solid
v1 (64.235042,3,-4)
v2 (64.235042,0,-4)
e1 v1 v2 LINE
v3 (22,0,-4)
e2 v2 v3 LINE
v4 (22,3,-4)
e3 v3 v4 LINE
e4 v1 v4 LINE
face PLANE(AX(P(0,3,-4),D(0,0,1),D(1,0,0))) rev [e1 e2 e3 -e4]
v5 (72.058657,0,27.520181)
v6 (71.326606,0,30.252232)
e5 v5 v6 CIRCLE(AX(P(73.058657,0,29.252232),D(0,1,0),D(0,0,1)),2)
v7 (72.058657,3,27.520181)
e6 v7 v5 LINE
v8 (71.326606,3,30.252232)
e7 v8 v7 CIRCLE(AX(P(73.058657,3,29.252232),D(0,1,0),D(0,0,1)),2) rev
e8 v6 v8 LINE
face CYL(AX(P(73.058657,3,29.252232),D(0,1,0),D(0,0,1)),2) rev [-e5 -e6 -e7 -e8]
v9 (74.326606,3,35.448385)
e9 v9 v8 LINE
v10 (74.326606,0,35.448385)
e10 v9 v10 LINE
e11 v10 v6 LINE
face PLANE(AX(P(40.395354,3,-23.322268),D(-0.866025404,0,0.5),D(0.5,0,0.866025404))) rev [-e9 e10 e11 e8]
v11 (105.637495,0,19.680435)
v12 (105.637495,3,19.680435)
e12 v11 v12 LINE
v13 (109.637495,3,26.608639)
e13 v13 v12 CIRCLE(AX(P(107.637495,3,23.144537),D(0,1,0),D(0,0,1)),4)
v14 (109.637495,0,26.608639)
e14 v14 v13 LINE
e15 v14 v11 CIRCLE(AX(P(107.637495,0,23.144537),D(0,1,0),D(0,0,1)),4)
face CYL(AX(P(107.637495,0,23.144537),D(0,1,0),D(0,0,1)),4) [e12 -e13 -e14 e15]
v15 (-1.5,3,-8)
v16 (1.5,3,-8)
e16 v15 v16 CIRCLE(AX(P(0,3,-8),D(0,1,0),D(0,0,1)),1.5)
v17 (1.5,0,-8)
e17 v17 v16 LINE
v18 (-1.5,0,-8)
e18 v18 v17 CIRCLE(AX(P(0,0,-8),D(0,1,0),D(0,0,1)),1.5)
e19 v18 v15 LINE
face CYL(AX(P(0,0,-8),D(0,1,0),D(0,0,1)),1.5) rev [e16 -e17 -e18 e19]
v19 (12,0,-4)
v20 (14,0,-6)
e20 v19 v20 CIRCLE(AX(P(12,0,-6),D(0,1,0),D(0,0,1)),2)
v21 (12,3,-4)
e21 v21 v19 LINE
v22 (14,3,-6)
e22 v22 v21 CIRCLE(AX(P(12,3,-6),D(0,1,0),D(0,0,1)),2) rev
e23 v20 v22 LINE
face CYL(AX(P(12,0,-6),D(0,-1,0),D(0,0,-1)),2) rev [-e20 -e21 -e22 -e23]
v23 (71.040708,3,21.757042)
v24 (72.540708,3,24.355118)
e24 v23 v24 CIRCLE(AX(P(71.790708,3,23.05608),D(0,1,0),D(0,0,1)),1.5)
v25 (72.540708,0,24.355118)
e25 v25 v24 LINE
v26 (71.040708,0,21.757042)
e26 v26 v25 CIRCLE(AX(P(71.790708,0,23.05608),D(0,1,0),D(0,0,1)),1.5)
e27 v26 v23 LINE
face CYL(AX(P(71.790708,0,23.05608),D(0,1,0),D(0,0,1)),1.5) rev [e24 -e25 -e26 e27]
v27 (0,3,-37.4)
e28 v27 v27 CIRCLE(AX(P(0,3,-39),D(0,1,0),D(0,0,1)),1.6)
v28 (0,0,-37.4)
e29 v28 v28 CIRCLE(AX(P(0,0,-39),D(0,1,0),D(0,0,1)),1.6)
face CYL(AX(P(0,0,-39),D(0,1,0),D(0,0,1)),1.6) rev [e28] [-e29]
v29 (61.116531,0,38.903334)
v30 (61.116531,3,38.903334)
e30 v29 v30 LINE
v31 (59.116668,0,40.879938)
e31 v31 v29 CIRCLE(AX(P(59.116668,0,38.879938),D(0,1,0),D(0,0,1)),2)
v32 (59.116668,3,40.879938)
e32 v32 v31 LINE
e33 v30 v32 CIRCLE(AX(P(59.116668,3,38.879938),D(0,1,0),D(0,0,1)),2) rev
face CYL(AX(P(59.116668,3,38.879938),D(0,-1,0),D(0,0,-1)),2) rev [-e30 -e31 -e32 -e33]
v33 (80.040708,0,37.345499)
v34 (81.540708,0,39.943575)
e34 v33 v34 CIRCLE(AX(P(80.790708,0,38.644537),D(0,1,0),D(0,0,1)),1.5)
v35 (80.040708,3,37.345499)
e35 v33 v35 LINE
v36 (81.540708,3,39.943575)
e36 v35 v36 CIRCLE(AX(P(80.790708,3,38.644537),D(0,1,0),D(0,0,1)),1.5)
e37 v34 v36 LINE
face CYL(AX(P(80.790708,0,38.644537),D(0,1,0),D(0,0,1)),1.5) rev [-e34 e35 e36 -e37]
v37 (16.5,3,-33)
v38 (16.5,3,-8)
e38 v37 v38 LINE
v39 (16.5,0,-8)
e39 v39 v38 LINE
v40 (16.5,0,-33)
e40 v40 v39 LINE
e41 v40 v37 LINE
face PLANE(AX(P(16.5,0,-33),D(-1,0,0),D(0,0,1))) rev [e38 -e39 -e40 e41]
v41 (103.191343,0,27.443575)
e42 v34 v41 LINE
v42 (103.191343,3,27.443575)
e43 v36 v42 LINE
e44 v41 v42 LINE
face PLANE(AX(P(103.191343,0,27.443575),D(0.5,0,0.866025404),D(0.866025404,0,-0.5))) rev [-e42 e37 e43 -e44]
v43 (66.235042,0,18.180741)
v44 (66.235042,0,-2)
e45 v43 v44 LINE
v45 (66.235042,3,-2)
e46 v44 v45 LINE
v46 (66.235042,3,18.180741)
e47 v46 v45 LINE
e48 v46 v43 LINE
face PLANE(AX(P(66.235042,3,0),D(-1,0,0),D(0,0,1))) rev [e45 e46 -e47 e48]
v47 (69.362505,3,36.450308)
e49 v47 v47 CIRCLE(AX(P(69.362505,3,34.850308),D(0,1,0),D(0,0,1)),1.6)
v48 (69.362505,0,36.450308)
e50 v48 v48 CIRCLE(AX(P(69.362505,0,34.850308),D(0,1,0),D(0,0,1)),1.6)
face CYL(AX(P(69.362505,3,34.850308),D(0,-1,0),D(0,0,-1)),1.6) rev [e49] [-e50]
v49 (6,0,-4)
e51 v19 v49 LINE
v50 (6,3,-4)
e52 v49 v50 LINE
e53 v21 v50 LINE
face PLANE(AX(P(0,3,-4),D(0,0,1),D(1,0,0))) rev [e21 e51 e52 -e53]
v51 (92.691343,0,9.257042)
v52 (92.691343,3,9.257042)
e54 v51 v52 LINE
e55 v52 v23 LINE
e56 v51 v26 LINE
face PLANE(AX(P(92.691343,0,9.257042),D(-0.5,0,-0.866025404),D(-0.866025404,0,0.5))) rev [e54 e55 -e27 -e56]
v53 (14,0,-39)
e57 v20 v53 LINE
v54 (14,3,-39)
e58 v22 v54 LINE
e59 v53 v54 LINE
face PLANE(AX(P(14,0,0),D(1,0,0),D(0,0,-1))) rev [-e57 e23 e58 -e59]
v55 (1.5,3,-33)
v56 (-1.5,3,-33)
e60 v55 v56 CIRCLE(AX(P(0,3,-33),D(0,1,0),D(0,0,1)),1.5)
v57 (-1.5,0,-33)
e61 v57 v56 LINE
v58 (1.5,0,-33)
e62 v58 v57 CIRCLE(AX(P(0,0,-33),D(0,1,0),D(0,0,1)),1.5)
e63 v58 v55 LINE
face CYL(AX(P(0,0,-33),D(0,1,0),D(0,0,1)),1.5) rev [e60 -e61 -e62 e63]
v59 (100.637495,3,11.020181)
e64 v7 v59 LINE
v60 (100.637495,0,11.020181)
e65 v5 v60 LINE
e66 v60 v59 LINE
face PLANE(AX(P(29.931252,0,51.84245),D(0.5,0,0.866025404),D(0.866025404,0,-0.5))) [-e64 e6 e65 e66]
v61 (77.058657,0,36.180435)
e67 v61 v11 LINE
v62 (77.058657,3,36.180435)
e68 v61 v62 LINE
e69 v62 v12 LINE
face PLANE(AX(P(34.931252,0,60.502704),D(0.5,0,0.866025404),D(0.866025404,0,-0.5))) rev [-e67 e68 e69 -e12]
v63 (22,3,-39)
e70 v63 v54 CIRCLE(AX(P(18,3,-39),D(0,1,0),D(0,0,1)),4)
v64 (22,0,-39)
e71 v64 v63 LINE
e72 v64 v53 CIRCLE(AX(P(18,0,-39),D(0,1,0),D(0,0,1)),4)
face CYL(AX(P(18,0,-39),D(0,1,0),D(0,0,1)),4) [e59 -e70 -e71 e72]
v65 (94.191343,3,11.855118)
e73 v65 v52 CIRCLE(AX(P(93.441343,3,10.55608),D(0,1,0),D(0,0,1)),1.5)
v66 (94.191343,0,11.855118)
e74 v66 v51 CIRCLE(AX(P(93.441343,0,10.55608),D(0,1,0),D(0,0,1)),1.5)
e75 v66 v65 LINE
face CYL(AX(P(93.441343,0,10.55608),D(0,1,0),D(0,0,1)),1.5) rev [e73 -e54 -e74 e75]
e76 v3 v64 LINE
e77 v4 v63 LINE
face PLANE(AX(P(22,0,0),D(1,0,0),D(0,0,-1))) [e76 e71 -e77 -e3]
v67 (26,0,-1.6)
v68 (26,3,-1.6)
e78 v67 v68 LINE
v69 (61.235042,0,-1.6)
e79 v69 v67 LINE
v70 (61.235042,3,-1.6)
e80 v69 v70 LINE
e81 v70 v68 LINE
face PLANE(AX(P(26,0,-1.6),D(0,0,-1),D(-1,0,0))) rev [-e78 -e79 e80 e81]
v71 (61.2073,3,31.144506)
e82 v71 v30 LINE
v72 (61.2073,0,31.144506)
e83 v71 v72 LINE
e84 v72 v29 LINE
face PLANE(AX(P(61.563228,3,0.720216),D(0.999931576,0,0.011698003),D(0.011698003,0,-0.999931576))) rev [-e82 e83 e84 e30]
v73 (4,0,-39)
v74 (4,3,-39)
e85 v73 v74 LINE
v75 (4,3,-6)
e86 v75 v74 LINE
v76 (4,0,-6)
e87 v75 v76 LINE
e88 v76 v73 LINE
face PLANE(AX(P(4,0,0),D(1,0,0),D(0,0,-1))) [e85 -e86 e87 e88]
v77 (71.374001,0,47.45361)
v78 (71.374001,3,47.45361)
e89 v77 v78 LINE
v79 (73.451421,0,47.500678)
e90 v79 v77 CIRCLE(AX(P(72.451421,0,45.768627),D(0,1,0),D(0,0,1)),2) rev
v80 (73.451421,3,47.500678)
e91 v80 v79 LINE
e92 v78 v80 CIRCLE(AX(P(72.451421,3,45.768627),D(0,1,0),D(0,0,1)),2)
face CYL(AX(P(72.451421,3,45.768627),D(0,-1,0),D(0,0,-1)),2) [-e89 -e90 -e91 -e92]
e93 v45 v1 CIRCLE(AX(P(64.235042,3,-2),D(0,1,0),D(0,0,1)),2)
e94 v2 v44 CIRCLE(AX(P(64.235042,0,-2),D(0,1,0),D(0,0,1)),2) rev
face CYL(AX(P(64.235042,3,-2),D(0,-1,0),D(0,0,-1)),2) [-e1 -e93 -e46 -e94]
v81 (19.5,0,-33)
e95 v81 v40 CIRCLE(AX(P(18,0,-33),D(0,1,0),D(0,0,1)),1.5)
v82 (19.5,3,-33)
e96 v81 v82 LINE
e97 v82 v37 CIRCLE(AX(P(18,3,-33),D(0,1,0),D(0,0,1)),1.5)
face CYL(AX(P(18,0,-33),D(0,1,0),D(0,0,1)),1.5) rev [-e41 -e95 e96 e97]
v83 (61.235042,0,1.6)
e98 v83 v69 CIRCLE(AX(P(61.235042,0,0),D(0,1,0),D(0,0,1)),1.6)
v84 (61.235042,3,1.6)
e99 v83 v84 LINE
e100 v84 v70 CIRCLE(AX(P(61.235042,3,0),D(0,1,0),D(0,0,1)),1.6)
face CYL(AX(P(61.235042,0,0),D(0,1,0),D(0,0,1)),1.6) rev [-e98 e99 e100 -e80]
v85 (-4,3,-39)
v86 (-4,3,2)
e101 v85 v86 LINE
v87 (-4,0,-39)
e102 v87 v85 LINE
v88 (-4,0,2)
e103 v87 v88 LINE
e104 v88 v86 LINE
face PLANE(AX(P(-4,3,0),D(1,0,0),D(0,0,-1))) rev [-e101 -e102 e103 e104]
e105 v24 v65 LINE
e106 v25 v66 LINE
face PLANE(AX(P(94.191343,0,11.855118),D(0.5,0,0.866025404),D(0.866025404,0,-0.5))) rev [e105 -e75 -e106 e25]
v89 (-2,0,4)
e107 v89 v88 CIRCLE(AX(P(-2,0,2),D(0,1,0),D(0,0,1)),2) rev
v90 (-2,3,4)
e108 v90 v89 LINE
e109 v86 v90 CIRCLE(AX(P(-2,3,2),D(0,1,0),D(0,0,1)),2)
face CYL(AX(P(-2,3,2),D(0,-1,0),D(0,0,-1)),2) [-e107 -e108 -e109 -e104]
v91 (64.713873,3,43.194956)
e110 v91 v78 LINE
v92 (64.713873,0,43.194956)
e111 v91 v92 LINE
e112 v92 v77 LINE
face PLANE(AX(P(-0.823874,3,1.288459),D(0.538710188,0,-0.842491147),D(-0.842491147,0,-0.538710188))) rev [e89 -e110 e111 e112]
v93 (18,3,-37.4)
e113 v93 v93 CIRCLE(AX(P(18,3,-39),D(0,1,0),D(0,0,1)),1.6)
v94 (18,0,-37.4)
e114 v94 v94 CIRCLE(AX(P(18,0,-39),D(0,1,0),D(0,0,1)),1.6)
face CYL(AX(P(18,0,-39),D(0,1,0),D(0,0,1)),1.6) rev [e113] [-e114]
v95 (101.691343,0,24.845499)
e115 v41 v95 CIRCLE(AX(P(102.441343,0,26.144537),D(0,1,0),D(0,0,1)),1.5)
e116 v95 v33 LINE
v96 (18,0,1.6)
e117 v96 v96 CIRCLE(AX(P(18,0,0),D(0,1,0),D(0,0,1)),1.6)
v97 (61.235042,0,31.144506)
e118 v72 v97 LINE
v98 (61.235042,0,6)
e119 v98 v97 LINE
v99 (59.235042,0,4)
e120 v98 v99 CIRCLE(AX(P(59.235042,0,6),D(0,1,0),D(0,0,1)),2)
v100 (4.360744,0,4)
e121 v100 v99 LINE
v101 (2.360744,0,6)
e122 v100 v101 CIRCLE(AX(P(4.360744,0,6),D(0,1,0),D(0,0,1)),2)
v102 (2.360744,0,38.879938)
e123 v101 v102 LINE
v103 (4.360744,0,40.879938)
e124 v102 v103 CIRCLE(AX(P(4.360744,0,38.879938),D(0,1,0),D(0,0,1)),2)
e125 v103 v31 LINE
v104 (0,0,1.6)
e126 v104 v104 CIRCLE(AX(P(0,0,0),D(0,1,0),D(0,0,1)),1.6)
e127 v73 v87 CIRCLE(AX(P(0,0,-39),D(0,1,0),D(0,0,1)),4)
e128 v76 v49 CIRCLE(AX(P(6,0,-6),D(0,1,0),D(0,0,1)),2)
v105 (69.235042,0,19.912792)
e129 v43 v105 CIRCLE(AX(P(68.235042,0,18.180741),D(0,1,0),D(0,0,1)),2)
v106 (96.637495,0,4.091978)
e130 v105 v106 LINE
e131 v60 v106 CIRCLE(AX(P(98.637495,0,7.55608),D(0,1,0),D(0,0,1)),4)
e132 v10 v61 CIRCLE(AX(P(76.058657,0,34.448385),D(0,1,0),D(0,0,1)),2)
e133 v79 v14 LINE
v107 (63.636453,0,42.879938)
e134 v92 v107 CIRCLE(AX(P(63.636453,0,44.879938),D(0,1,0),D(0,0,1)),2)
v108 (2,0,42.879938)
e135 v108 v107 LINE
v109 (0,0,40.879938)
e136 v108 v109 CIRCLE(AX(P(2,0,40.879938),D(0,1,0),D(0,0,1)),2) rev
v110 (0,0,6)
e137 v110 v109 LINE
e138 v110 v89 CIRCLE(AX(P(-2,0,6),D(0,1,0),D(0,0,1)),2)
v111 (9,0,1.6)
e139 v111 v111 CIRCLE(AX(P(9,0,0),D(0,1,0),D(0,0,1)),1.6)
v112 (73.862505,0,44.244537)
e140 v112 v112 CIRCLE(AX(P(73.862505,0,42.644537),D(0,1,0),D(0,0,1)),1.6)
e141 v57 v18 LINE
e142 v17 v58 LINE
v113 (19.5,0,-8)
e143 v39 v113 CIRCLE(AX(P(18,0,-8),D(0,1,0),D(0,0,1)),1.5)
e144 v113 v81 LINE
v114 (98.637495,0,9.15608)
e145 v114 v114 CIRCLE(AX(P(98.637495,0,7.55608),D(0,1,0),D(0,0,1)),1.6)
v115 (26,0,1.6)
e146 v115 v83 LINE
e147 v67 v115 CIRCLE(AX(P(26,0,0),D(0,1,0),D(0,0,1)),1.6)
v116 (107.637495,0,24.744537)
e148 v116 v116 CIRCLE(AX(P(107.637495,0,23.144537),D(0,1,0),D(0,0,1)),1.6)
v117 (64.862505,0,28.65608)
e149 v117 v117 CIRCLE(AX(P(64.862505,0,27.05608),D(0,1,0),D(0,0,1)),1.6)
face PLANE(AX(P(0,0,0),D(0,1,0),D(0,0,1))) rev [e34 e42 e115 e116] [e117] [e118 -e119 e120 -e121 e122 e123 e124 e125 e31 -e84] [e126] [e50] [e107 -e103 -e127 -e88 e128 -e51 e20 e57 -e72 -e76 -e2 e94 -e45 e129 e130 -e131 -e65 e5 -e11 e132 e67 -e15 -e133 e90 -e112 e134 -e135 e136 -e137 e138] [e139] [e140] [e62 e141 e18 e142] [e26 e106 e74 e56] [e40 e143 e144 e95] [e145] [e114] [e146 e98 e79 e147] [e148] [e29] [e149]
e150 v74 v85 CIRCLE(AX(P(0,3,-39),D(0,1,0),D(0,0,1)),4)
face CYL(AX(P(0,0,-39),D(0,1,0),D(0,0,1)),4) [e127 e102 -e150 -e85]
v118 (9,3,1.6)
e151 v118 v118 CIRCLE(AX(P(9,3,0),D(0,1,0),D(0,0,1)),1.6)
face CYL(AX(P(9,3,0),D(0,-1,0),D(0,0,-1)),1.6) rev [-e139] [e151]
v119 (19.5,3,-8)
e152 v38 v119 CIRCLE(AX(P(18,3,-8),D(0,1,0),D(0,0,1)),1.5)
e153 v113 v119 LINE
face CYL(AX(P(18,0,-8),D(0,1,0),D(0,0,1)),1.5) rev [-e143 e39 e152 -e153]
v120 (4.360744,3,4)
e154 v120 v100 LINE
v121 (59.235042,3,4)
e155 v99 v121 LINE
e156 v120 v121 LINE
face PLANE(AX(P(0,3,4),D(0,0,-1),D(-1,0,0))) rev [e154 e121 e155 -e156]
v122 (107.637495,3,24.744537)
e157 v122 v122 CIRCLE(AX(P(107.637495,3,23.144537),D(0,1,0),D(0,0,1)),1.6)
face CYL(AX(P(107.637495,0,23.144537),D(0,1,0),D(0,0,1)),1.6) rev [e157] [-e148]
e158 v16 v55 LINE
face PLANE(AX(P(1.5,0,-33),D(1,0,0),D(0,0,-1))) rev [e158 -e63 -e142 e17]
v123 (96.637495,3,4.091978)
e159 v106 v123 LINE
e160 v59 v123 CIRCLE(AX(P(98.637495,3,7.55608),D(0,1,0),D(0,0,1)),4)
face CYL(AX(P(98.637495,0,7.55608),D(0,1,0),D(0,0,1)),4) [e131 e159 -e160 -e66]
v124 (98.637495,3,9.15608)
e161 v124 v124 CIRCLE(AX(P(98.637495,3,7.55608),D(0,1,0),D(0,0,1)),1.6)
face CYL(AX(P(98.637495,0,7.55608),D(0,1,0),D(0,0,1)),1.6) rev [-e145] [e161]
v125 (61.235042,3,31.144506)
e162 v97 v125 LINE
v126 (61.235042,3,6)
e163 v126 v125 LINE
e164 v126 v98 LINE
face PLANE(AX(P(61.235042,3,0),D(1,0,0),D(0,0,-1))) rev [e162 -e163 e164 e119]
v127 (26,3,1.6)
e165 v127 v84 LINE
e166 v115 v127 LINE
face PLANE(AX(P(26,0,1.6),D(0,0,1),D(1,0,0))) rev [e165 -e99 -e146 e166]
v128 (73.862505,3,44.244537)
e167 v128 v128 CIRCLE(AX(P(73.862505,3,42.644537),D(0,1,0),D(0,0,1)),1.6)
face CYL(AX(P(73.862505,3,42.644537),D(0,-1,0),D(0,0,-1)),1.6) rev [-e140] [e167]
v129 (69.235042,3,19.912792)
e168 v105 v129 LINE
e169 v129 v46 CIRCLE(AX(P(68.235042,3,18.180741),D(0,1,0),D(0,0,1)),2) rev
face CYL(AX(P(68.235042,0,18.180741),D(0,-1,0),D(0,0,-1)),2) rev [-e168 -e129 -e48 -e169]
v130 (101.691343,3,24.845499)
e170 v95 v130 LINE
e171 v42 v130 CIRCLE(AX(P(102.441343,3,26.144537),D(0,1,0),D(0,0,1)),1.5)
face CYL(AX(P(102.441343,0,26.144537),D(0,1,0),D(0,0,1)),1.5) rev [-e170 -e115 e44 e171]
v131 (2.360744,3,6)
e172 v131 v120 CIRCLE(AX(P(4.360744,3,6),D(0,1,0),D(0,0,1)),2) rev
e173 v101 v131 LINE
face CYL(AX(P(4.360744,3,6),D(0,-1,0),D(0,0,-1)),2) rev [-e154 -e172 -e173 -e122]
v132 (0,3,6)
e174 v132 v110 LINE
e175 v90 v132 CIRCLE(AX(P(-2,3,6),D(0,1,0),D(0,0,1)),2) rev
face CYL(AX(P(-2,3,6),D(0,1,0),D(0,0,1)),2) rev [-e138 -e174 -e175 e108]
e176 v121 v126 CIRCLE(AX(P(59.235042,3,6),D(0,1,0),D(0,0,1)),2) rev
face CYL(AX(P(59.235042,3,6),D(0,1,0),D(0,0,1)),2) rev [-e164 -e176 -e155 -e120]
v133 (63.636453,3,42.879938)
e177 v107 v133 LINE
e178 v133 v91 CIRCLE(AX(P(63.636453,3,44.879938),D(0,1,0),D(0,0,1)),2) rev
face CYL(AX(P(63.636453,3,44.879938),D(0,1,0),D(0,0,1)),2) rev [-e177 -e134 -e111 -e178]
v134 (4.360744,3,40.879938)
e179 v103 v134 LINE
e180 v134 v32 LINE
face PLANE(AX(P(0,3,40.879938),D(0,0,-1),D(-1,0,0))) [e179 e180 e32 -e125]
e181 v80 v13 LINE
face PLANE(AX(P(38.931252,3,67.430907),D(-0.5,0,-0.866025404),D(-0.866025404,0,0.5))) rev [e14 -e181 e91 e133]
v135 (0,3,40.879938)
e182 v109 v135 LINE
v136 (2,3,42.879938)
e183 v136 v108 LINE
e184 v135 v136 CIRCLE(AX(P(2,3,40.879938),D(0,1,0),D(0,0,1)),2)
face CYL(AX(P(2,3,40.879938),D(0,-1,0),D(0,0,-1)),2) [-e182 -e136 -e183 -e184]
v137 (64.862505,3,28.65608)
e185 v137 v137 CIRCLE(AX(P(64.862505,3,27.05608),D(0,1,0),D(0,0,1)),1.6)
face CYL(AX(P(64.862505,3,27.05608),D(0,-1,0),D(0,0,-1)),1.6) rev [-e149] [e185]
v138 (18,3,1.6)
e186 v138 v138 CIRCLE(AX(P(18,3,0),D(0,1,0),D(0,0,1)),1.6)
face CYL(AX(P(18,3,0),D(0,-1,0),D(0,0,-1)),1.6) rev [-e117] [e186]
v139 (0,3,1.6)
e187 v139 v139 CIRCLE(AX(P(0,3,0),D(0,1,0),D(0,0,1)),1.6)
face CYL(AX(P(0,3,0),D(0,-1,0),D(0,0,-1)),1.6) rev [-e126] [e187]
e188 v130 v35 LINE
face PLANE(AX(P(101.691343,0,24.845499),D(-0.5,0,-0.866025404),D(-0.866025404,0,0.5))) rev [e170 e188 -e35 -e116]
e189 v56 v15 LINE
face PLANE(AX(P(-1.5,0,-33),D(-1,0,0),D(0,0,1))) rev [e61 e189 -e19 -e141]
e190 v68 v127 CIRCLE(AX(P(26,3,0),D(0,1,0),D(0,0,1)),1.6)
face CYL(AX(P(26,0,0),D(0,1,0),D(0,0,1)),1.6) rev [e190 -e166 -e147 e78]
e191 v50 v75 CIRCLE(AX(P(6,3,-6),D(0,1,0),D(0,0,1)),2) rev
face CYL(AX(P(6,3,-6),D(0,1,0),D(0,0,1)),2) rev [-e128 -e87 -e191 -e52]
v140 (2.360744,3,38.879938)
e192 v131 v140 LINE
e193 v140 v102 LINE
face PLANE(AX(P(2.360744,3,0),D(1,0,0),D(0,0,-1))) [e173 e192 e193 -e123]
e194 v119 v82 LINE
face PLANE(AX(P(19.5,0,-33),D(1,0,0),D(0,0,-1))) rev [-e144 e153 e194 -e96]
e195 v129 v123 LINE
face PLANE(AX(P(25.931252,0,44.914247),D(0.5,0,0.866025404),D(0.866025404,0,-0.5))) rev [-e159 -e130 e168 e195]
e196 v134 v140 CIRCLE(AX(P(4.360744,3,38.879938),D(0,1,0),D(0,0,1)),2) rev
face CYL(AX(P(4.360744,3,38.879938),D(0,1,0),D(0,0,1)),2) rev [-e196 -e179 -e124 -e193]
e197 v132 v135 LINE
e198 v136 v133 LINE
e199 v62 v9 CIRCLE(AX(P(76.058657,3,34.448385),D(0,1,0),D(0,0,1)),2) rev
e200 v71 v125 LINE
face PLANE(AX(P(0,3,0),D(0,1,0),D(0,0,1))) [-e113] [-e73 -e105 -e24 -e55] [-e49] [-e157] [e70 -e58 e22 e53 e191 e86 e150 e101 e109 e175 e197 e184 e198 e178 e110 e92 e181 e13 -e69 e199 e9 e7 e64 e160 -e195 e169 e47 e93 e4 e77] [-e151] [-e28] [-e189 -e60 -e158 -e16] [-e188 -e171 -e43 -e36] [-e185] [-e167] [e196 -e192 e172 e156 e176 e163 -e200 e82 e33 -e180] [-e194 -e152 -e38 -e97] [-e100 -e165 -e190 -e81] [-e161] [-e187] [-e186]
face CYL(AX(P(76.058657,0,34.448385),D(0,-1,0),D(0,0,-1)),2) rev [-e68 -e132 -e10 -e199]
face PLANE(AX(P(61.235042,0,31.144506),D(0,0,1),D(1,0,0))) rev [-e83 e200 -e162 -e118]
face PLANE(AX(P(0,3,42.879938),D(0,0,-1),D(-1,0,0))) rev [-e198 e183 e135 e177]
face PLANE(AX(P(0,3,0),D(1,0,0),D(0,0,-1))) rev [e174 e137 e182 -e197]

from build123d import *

# Parameters (mm, degrees)
SKETCH1_R           = 1.6
BOSS_EXTRUDE1_DEPTH = 3
FILLET1_R           = 2
FILLET2_R           = 2
CUT_EXTRUDE1_DEPTH  = 3
BOSS_EXTRUDE2_DEPTH = 3
SKETCH5_W           = 5.72828372
SKETCH5_H           = 7.781232697
CUT_EXTRUDE2_DEPTH  = 3
SKETCH6_R           = 1.6
CUT_EXTRUDE3_DEPTH  = 3
FILLET3_R           = 2
CUT_EXTRUDE4_DEPTH  = 3


with BuildPart() as part:
    # Sketch1 → Boss-Extrude1 (new body)
    # profile 1 of 3: a face of its own
    with BuildSketch(Plane(origin=(0, 0, 0), x_dir=(1, 0, 0), z_dir=(0, 1, 0))):
        Polygon((66.235042478, 4), (-4, 4), (-4, -4), (61.235042478, -4), (61.235042478, -28.773130918), (72.398403011, -48.108638544), (79.326606241, -44.108638544), (66.235042478, -21.433384956), align=None)
        with Locations(Location((18, 0, 0), (0, 0, 270))):
            Circle(SKETCH1_R, mode=Mode.SUBTRACT)
        with Locations(Location((9, 0, 0), (0, 0, 270))):
            Circle(SKETCH1_R, mode=Mode.SUBTRACT)
        with Locations(Location((0, 0, 0), (0, 0, 270))):
            Circle(SKETCH1_R, mode=Mode.SUBTRACT)
        with Locations(Location((64.862504626, -27.056079661, 0), (0, 0, 270))):
            Circle(SKETCH1_R, mode=Mode.SUBTRACT)
        with Locations(Location((69.362504626, -34.850308295, 0), (0, 0, 270))):
            Circle(SKETCH1_R, mode=Mode.SUBTRACT)
        with Locations(Location((73.862504626, -42.644536929, 0), (0, 0, 270))):
            Circle(SKETCH1_R, mode=Mode.SUBTRACT)
    # profile 2 of 3: a face of its own
    with BuildSketch(Plane(origin=(0, 0, 0), x_dir=(1, 0, 0), z_dir=(0, 1, 0))):
        Polygon((2.360744243, -4), (0, -4), (0, -42.879937828), (64.221215797, -42.879937828), (61.09340732, -40.879937828), (2.360744243, -40.879937828), align=None)
    # profile 3 of 3: a face of its own
    with BuildSketch(Plane(origin=(0, 0, 0), x_dir=(1, 0, 0), z_dir=(0, 1, 0))):
        Polygon((61.235042478, -28.773130918), (72.398403011, -48.108638544), (61.09340732, -40.879937828), align=None)
    extrude(amount=BOSS_EXTRUDE1_DEPTH)

    # Fillet1
    fillet1_edges = [part.edges().sort_by_distance(p)[0] for p in [
        (61.235042478, 1.5, 28.773130918),
        (61.235042478, 1.5, 4),
        (2.360744243, 1.5, 4),
        (2.360744243, 1.5, 40.879937828),
        (61.09340732, 1.5, 40.879937828),
    ]]
    fillet(fillet1_edges, radius=FILLET1_R)

    # Fillet2
    fillet2_edges = [part.edges().sort_by_distance(p)[0] for p in [
        (0, 1.5, 4),
        (-4, 1.5, 4),
        (-4, 1.5, -4),
        (66.235042478, 1.5, -4),
        (66.235042478, 1.5, 21.433384956),
        (79.326606241, 1.5, 44.108638544),
        (72.398403011, 1.5, 48.108638544),
        (64.221215797, 1.5, 42.879937828),
        (0, 1.5, 42.879937828),
    ]]
    fillet(fillet2_edges, radius=FILLET2_R - 0.0001)  # a hair under: the kernel refuses the full size

    # Sketch2 → Cut-Extrude1 (cut)
    with BuildSketch(Plane(origin=(0, 3, 0), x_dir=(1, 0, 0), z_dir=(0, 1, 0))):
        with BuildLine():
            Line((26, 1.6), (61.235042478, 1.6))
            ThreePointArc((61.235042478, 1.6), (62.835042478, 0), (61.235042478, -1.6))
            Line((61.235042478, -1.6), (26, -1.6))
            ThreePointArc((26, -1.6), (24.4, 0), (26, 1.6))
        make_face()
    extrude(amount=-CUT_EXTRUDE1_DEPTH, mode=Mode.SUBTRACT)

    # Sketch4 → Boss-Extrude2 (add)
    with BuildSketch(Plane(origin=(0, 3, 0), x_dir=(1, 0, 0), z_dir=(0, 1, 0))):
        with BuildLine():
            Line((-2.0001, 4), (4, 4))
            Line((4, 4), (4, 39))
            ThreePointArc((4, 39), (0, 43), (-4, 39))
            Line((-4, 39), (-4, 2.0001))
            ThreePointArc((-4, 2.0001), (-3.414242852, 3.414242852), (-2.0001, 4))
        make_face()
        with BuildLine():
            Line((14, 39), (14, 4))
            Line((14, 4), (22, 4))
            Line((22, 4), (22, 39))
            ThreePointArc((22, 39), (18, 43), (14, 39))
        make_face()
        with BuildLine():
            Line((96.637495374, -4.091978046), (66.35375998, -21.576300827))
            ThreePointArc((66.35375998, -21.576300827), (66.421246357, -21.740191472), (66.502978273, -21.897463366))
            Line((66.502978273, -21.897463366), (70.326606241, -28.520181276))
            Line((70.326606241, -28.520181276), (100.637495374, -11.020181276))
            ThreePointArc((100.637495374, -11.020181276), (102.101596989, -5.556079661), (96.637495374, -4.091978046))
        make_face()
        with BuildLine():
            Line((105.637495374, -19.680435314), (75.326606241, -37.180435314))
            Line((75.326606241, -37.180435314), (78.326656241, -42.376674339))
            ThreePointArc((78.326656241, -42.376674339), (78.526447096, -43.894236547), (77.594642036, -45.108588544))
            Line((77.594642036, -45.108588544), (109.637495374, -26.608638544))
            ThreePointArc((109.637495374, -26.608638544), (111.101596989, -21.144536929), (105.637495374, -19.680435314))
        make_face()
    extrude(amount=-BOSS_EXTRUDE2_DEPTH)

    # Sketch5 → Cut-Extrude2 (cut)
    with BuildSketch(Plane(origin=(0, 3, 0), x_dir=(1, 0, 0), z_dir=(0, 1, 0))):
        with Locations((58.370900618, -27.25388929)):
            Rectangle(SKETCH5_W, SKETCH5_H)
    extrude(amount=-CUT_EXTRUDE2_DEPTH, mode=Mode.SUBTRACT)

    # Sketch6 → Cut-Extrude3 (cut)
    with BuildSketch(Plane(origin=(0, 3, 0), x_dir=(1, 0, 0), z_dir=(0, 1, 0))):
        with Locations(Location((0, 39, 0), (0, 0, 270))):
            Circle(SKETCH6_R)
        with Locations(Location((18, 39, 0), (0, 0, 270))):
            Circle(SKETCH6_R)
        with Locations(Location((98.637495374, -7.556079661, 0), (0, 0, 270))):
            Circle(SKETCH6_R)
        with Locations(Location((107.637495374, -23.144536929, 0), (0, 0, 270))):
            Circle(SKETCH6_R)
    extrude(amount=-CUT_EXTRUDE3_DEPTH, mode=Mode.SUBTRACT)

    # Fillet3
    fillet3_edges = [part.edges().sort_by_distance(p)[0] for p in [
        (14, 1.5, -4),
        (4, 1.5, -4),
        (75.326606241, 1.5, 37.180435314),
        (70.326606241, 1.5, 28.520181276),
        (66.35375998, 1.5, 21.576300827),
    ]]
    fillet(fillet3_edges, radius=FILLET3_R)

    # Sketch8 → Cut-Extrude4 (cut)
    with BuildSketch(Plane(origin=(0, 3, 0), x_dir=(1, 0, 0), z_dir=(0, 1, 0))):
        with BuildLine():
            Line((1.5, 33), (1.5, 8))
            ThreePointArc((1.5, 8), (0, 6.5), (-1.5, 8))
            Line((-1.5, 8), (-1.5, 33))
            ThreePointArc((-1.5, 33), (0, 34.5), (1.5, 33))
        make_face()
        with BuildLine():
            Line((19.5, 33), (19.5, 8))
            ThreePointArc((19.5, 8), (18, 6.5), (16.5, 8))
            Line((16.5, 8), (16.5, 33))
            ThreePointArc((16.5, 33), (18, 34.5), (19.5, 33))
        make_face()
        with BuildLine():
            Line((94.191342951, -11.855117767), (72.540707856, -24.355117767))
            ThreePointArc((72.540707856, -24.355117767), (70.491669751, -23.806079661), (71.040707856, -21.757041555))
            Line((71.040707856, -21.757041555), (92.691342951, -9.257041555))
            ThreePointArc((92.691342951, -9.257041555), (94.740381057, -9.806079661), (94.191342951, -11.855117767))
        make_face()
        with BuildLine():
            Line((103.191342951, -27.443575035), (81.540707856, -39.943575035))
            ThreePointArc((81.540707856, -39.943575035), (79.491669751, -39.394536929), (80.040707856, -37.345498823))
            Line((80.040707856, -37.345498823), (101.691342951, -24.845498823))
            ThreePointArc((101.691342951, -24.845498823), (103.740381057, -25.394536929), (103.191342951, -27.443575035))
        make_face()
    extrude(amount=-CUT_EXTRUDE4_DEPTH, mode=Mode.SUBTRACT)


solid = part.part
